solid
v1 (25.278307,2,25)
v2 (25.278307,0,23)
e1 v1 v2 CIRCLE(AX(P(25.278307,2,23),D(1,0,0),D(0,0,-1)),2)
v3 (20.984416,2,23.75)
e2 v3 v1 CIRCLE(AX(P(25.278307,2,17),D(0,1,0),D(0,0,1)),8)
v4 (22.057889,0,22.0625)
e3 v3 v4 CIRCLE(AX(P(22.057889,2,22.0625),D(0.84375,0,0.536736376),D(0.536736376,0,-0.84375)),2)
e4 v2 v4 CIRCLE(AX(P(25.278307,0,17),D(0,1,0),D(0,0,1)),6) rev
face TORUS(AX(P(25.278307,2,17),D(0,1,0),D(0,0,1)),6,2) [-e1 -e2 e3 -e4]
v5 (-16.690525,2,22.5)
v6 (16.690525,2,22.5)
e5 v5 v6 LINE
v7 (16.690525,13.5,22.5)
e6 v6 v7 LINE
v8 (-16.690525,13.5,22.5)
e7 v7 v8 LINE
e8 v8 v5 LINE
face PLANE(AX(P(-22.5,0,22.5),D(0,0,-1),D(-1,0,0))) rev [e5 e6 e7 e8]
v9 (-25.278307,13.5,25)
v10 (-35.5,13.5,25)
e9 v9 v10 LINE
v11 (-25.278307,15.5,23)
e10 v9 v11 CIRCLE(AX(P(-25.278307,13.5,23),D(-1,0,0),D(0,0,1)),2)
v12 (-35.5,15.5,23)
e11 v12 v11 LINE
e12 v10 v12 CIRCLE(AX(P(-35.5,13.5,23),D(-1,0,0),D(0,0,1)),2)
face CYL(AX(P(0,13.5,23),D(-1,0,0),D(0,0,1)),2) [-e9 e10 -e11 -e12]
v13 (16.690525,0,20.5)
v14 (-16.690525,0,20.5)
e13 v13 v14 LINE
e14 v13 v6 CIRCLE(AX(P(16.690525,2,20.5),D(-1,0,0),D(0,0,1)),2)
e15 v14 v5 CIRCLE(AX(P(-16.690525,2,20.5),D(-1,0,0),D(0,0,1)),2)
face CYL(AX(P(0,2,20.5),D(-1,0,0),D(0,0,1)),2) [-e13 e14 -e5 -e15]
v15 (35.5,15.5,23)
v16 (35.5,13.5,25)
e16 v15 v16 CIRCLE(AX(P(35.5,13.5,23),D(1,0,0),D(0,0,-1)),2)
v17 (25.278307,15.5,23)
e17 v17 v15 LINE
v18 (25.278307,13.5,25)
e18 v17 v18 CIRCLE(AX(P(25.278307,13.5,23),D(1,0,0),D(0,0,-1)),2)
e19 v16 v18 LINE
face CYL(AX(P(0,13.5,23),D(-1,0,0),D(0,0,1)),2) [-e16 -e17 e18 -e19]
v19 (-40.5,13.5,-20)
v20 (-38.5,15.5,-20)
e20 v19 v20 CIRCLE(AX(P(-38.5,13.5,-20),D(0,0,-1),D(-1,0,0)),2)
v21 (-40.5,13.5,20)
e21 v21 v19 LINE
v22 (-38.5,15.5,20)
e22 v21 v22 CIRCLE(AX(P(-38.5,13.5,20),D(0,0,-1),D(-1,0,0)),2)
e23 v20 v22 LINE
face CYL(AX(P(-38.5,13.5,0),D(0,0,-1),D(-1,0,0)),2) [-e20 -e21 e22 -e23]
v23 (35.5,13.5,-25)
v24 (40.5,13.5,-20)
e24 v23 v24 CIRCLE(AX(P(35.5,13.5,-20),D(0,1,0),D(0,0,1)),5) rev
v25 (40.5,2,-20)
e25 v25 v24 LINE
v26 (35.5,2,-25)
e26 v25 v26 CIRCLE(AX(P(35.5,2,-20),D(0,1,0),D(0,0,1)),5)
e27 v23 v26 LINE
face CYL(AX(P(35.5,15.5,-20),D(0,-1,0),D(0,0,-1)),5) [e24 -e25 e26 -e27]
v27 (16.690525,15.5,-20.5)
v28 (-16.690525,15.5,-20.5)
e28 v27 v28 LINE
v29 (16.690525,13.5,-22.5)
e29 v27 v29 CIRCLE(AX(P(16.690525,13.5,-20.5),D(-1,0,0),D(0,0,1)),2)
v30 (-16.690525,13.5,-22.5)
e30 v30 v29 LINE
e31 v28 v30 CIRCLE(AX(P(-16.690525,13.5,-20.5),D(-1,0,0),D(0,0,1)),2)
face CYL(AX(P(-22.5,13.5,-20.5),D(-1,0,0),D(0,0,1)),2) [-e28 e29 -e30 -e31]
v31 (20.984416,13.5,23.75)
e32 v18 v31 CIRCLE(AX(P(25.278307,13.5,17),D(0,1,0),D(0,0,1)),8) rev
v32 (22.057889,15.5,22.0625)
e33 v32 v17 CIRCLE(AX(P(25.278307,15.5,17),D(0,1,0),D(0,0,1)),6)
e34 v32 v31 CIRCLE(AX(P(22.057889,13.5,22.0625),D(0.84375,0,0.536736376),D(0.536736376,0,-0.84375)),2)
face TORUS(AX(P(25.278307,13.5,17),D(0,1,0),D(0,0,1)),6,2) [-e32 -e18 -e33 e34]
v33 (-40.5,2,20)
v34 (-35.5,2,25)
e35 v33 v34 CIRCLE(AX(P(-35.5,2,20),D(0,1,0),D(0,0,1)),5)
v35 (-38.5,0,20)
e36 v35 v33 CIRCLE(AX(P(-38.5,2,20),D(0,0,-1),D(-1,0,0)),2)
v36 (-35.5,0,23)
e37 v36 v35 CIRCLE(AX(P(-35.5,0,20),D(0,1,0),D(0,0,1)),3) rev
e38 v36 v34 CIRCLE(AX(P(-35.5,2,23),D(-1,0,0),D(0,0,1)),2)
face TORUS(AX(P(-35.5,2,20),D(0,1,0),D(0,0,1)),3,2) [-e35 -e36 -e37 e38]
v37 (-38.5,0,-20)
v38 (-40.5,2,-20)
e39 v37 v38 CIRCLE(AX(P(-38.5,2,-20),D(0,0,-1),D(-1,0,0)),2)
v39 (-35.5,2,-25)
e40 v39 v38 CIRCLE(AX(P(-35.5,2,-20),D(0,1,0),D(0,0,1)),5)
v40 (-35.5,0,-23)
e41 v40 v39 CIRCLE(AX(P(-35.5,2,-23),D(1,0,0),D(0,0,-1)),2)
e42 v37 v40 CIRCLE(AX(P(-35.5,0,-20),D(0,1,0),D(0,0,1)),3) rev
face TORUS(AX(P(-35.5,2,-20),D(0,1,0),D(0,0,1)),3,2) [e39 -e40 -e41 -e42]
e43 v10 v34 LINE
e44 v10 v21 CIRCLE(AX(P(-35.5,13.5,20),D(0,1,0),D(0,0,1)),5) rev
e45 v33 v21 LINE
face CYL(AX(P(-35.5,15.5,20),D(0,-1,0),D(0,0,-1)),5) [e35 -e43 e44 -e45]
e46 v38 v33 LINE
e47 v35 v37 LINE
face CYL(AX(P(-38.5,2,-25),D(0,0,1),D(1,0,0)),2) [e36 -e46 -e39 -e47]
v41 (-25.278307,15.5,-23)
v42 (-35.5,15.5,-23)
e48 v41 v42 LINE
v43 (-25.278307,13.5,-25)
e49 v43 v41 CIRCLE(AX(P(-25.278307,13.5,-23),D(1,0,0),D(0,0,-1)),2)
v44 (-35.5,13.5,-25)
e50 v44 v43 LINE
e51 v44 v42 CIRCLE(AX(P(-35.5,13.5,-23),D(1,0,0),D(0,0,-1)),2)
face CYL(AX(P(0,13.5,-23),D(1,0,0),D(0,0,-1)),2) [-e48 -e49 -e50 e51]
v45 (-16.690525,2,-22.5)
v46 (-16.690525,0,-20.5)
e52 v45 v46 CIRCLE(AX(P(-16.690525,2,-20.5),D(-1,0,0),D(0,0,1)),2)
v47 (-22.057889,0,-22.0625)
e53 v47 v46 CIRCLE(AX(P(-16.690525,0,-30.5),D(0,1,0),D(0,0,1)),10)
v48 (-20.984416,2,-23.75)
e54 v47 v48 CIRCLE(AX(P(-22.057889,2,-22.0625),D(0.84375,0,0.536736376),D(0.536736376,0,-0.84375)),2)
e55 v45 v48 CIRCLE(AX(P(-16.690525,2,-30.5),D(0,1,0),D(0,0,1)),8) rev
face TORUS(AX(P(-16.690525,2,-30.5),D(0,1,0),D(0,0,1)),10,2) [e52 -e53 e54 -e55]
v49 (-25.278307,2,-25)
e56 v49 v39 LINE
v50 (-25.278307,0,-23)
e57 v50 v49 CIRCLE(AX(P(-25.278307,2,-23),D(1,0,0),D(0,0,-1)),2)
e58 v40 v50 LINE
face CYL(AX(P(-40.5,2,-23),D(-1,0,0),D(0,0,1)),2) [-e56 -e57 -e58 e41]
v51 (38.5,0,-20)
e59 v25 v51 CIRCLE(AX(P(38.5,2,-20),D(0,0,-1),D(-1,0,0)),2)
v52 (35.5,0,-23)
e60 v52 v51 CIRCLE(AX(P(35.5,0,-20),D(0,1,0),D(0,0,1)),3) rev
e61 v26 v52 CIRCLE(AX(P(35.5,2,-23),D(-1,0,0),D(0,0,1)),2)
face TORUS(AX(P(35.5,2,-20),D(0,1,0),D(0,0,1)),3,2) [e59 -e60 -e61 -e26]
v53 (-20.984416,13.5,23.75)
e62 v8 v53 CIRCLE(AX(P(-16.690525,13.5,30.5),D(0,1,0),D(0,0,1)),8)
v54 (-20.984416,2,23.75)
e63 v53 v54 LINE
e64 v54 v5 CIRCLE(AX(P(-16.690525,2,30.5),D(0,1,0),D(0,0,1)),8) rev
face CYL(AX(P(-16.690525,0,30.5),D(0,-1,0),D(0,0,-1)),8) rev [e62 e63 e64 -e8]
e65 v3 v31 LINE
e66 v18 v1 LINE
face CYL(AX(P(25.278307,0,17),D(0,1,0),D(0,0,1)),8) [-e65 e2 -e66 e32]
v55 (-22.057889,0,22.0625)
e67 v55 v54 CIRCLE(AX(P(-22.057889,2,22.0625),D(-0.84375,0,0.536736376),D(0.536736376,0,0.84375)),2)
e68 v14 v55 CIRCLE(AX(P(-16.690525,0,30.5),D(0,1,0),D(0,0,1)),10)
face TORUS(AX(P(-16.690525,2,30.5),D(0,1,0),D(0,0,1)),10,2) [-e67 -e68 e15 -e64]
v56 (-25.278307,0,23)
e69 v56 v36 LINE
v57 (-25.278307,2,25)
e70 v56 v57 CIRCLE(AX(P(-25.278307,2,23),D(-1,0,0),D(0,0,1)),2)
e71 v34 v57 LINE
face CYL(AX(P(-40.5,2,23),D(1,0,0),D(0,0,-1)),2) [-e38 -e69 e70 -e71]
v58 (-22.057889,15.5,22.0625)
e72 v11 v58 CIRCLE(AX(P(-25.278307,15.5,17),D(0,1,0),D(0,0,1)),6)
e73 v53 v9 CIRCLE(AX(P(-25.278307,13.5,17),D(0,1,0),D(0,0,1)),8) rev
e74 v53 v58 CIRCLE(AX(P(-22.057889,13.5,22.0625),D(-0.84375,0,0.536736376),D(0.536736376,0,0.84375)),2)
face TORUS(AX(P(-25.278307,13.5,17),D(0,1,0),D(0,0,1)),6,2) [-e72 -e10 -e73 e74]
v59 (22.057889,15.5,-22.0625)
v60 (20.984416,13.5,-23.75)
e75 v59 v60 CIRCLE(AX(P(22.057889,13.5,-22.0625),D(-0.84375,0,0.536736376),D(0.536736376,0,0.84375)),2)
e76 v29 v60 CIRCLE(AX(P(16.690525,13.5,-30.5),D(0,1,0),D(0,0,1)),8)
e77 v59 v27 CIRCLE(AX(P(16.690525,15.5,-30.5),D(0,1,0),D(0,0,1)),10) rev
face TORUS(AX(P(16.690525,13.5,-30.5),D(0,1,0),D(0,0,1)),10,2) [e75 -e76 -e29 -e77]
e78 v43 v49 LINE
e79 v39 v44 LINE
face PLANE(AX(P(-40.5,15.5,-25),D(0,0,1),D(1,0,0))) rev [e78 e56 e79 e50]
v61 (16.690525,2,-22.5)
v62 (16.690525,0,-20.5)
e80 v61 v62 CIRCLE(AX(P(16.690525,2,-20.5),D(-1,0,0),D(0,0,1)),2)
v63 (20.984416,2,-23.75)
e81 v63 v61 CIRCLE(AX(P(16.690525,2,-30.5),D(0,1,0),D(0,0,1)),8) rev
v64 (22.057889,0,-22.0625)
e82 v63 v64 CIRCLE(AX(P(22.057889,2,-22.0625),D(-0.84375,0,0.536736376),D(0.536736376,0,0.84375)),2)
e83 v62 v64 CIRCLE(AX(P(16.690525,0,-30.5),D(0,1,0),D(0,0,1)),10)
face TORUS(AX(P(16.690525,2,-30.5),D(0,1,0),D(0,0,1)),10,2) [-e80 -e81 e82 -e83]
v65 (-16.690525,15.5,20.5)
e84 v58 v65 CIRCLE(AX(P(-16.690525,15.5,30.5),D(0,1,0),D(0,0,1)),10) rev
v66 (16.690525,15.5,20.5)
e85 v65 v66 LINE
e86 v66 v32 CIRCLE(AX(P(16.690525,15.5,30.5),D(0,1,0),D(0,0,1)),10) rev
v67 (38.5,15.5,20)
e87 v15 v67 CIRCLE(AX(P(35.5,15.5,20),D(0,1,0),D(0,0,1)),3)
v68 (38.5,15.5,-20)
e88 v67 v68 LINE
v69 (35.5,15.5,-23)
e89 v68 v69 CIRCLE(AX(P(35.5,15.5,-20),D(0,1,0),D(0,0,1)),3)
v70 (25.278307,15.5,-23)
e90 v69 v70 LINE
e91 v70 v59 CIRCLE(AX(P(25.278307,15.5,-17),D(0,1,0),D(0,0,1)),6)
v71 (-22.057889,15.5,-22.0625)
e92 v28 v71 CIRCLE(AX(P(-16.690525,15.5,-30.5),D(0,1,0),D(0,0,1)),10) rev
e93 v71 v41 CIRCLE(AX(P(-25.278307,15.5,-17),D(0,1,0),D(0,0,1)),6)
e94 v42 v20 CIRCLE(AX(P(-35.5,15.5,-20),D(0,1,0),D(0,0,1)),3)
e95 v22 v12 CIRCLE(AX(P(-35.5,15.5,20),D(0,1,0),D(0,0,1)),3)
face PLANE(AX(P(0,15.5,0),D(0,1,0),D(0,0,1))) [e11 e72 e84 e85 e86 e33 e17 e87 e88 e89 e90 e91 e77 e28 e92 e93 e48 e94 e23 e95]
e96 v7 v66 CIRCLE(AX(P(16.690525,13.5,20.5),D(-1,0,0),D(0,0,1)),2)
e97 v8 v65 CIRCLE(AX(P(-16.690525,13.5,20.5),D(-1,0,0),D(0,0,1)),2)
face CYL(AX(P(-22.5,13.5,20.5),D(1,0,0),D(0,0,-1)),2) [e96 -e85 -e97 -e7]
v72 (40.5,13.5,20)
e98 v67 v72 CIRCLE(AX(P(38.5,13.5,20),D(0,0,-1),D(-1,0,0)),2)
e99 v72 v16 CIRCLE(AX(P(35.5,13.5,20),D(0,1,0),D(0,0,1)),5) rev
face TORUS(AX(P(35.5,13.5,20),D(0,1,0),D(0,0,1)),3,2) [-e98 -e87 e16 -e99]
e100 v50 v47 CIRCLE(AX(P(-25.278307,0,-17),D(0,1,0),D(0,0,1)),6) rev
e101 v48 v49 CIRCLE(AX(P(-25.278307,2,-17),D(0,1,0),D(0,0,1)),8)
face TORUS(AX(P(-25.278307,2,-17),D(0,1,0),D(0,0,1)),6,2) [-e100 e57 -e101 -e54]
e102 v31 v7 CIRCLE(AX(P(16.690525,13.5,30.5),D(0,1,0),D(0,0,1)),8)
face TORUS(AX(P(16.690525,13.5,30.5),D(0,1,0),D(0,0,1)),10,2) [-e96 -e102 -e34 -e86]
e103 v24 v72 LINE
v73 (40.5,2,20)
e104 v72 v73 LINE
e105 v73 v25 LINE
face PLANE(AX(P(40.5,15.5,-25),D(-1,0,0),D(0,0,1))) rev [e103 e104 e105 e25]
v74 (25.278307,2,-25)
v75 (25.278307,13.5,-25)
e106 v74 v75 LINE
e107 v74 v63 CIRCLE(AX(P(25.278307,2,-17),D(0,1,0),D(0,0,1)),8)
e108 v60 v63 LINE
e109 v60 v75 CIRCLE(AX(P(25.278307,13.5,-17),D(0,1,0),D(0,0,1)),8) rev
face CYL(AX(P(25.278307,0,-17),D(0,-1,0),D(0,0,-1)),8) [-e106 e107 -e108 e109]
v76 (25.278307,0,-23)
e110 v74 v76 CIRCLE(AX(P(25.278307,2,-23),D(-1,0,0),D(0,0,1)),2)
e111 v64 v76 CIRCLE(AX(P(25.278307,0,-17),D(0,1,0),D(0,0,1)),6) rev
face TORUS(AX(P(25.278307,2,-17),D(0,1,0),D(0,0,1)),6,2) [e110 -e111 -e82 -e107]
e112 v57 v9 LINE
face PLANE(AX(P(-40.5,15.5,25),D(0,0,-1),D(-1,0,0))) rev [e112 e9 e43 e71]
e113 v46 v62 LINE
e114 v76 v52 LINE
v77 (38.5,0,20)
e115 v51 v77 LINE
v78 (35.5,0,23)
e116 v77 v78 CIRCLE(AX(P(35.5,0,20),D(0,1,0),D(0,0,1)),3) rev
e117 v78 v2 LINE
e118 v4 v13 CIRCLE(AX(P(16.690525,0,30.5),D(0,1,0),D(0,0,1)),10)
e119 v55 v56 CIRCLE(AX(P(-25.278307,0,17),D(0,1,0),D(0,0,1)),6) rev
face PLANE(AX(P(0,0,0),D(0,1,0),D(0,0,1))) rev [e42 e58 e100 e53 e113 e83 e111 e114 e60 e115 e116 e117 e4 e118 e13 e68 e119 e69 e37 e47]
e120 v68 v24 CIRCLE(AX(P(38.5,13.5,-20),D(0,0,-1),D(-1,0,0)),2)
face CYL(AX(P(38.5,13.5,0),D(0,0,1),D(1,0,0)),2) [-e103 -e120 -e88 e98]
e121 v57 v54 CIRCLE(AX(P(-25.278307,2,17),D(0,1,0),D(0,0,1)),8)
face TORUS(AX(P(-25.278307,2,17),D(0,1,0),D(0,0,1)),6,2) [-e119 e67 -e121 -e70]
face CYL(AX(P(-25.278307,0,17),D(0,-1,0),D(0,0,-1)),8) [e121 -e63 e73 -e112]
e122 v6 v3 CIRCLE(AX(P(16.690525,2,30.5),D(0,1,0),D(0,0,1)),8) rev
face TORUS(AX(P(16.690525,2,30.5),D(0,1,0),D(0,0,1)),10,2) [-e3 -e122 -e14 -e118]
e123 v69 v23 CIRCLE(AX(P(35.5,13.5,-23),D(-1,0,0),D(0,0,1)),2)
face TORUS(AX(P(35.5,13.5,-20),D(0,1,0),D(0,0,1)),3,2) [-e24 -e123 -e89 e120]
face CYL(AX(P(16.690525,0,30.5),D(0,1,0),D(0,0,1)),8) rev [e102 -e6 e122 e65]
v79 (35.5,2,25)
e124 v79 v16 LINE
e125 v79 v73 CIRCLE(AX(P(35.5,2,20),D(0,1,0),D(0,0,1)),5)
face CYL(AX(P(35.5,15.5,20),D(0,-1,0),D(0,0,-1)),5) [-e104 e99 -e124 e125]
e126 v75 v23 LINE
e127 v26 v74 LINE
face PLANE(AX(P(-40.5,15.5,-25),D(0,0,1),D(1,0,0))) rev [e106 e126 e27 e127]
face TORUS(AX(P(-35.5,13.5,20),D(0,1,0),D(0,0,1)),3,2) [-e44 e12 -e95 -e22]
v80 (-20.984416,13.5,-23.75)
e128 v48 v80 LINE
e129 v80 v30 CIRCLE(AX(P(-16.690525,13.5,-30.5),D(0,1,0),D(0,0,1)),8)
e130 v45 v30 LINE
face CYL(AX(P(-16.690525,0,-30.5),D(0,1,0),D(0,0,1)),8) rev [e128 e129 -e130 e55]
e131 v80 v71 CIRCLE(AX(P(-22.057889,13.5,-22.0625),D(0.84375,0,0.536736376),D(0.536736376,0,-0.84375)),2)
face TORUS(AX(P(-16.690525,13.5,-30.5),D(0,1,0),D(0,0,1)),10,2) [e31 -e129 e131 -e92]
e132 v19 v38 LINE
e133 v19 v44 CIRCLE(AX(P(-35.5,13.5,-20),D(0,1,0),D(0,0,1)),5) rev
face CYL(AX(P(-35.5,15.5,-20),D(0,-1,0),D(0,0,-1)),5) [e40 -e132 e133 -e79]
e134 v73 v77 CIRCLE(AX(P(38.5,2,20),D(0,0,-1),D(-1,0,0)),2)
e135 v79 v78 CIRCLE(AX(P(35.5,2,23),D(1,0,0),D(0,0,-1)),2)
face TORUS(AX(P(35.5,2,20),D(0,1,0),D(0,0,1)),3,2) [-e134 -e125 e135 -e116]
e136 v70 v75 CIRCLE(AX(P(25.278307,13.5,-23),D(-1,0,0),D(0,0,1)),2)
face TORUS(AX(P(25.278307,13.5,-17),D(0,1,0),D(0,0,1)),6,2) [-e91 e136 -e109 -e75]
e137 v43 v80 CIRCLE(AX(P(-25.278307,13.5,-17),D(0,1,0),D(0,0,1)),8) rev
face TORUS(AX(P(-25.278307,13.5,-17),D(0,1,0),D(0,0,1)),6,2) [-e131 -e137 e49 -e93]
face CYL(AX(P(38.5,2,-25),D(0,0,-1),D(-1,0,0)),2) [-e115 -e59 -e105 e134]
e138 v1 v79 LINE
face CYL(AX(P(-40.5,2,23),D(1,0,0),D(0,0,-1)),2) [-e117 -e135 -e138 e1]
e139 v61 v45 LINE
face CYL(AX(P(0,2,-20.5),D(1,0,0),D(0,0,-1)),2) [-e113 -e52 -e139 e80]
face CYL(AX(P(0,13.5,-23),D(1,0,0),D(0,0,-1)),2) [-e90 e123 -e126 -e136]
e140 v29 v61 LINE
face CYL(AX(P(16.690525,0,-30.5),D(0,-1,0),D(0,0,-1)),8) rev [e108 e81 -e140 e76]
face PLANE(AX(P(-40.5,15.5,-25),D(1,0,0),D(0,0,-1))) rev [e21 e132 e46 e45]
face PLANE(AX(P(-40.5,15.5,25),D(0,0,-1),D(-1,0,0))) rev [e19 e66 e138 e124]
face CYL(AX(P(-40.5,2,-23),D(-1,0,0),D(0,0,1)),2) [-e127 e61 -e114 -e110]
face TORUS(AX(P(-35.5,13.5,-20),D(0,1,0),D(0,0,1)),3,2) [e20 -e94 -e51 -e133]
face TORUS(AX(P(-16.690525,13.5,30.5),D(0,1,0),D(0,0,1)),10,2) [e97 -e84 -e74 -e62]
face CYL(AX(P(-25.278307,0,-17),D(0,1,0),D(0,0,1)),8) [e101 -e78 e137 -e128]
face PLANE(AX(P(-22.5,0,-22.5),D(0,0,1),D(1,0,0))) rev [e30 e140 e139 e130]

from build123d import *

# Parameters (mm, degrees)
SKETCH1_W           = 81
SKETCH1_H           = 50
BOSS_EXTRUDE1_DEPTH = 15.5
SKETCH2_W           = 45
SKETCH2_H           = 2.5
CUT_EXTRUDE1_DEPTH  = 51.054969783
FILLET1_R           = 8
FILLET2_R           = 8
FILLET3_R           = 5
FILLET4_R           = 2


with BuildPart() as part:
    # Sketch1 → Boss-Extrude1 (new body)
    with BuildSketch(Plane(origin=(0, 0, 0), x_dir=(1, 0, 0), z_dir=(0, 1, 0))):
        Rectangle(SKETCH1_W, SKETCH1_H)
    extrude(amount=BOSS_EXTRUDE1_DEPTH)

    # Sketch2 → Cut-Extrude1 (cut, through all)
    with BuildSketch(Plane(origin=(0, 15.5, 0), x_dir=(1, 0, 0), z_dir=(0, 1, 0))):
        with Locations((0, 23.75)):
            Rectangle(SKETCH2_W, SKETCH2_H)
        with Locations((0, -23.75)):
            Rectangle(SKETCH2_W, SKETCH2_H)
    extrude(amount=-CUT_EXTRUDE1_DEPTH, mode=Mode.SUBTRACT)

    # Fillet1
    # the kernel refuses this fillet: 8 mm, written as the material it adds along each edge
    with BuildSketch(Plane(origin=(22.5, 15.5, 22.5), x_dir=(-1, 0, 0), z_dir=(0, -1, 0))) as fillet1_piece_1:
        with BuildLine():
            CenterArc((5.809475019, -8), FILLET1_R, 90, 46.567463442)
            Line((0, -2.5), (-0.1161895, -2.39))
            ThreePointArc((-0.1161895, -2.39), (-0.16, -1.25), (-0.16, 0))
            Line((-0.16, 0), (0, 0.16))
            Line((0, 0.16), (5.809475019, 0.16))
            Line((5.809475019, 0.16), (5.809475019, 0))
        make_face()
    extrude(amount=15.5)
    with BuildSketch(Plane(origin=(-22.5, 15.5, 22.5), x_dir=(0, 0, 1), z_dir=(0, -1, 0)), Plane(origin=(22.5, 15.5, -22.5), x_dir=(0, 0, -1), z_dir=(0, -1, 0))) as fillet1_piece_2:
        with BuildLine():
            CenterArc((8, -5.809475019), FILLET1_R, 133.432536558, 46.567463442)
            Line((0, -5.809475019), (-0.16, -5.809475019))
            Line((-0.16, -5.809475019), (-0.16, 0))
            Line((-0.16, 0), (0, 0.16))
            ThreePointArc((0, 0.16), (1.25, 0.16), (2.39, 0.1161895))
            Line((2.39, 0.1161895), (2.5, 0))
        make_face()
    extrude(amount=15.5)
    with BuildSketch(Plane(origin=(-22.5, 15.5, -22.5), x_dir=(0, 0, -1), z_dir=(0, -1, 0))) as fillet1_piece_3:
        with BuildLine():
            CenterArc((8, 5.809475019), FILLET1_R, 180, 46.567463442)
            Line((0, 5.809475019), (-0.16, 5.809475019))
            Line((-0.16, 5.809475019), (-0.16, 0))
            Line((-0.16, 0), (0, -0.16))
            ThreePointArc((0, -0.16), (1.25, -0.16), (2.39, -0.1161895))
            Line((2.39, -0.1161895), (2.5, 0))
        make_face()
    extrude(amount=15.5)

    # Fillet2
    fillet2_edges = [part.edges().sort_by_distance(p)[0] for p in [
        (22.5, 7.75, -25),
        (-22.5, 7.75, -25),
        (22.5, 7.75, 25),
        (-22.5, 7.75, 25),
    ]]
    fillet(fillet2_edges, radius=FILLET2_R)

    # Fillet3
    fillet3_edges = [part.edges().sort_by_distance(p)[0] for p in [
        (-40.5, 7.75, -25),
        (40.5, 7.75, -25),
        (40.5, 7.75, 25),
        (-40.5, 7.75, 25),
    ]]
    fillet(fillet3_edges, radius=FILLET3_R)

    # Fillet4
    fillet4_edges = [part.edges().sort_by_distance(p)[0] for p in [
        (0, 15.5, 22.5),
        (0, 0, 22.5),
        (0, 15.5, -22.5),
        (0, 0, -22.5),
        (18.926592958, 15.5, 22.818854252),
        (-18.926592958, 0, 22.818854252),
        (-18.926592958, 15.5, -22.818854252),
        (18.926592958, 0, -22.818854252),
        (-18.926592958, 15.5, 22.818854252),
        (30.3891535, 15.5, 25),
        (18.926592958, 15.5, -22.818854252),
        (-30.3891535, 15.5, -25),
        (23.042239022, 15.5, 24.681145748),
        (-23.042239022, 15.5, 24.681145748),
        (-23.042239022, 15.5, -24.681145748),
        (23.042239022, 15.5, -24.681145748),
        (30.3891535, 0, 25),
        (18.926592958, 0, 22.818854252),
        (-30.3891535, 0, -25),
        (-18.926592958, 0, -22.818854252),
        (23.042239022, 0, 24.681145748),
        (-23.042239022, 0, 24.681145748),
        (-23.042239022, 0, -24.681145748),
        (23.042239022, 0, -24.681145748),
        (30.3891535, 0, -25),
        (30.3891535, 15.5, -25),
        (40.5, 0, 0),
        (-30.3891535, 0, 25),
        (-40.5, 0, 0),
        (-39.035533906, 0, -23.535533906),
        (-39.035533906, 0, 23.535533906),
        (39.035533906, 0, 23.535533906),
        (39.035533906, 0, -23.535533906),
        (40.5, 15.5, 0),
        (-40.5, 15.5, 0),
        (-30.3891535, 15.5, 25),
        (-39.035533906, 15.5, -23.535533906),
        (-39.035533906, 15.5, 23.535533906),
        (39.035533906, 15.5, 23.535533906),
        (39.035533906, 15.5, -23.535533906),
    ]]
    fillet(fillet4_edges, radius=FILLET4_R)


solid = part.part
